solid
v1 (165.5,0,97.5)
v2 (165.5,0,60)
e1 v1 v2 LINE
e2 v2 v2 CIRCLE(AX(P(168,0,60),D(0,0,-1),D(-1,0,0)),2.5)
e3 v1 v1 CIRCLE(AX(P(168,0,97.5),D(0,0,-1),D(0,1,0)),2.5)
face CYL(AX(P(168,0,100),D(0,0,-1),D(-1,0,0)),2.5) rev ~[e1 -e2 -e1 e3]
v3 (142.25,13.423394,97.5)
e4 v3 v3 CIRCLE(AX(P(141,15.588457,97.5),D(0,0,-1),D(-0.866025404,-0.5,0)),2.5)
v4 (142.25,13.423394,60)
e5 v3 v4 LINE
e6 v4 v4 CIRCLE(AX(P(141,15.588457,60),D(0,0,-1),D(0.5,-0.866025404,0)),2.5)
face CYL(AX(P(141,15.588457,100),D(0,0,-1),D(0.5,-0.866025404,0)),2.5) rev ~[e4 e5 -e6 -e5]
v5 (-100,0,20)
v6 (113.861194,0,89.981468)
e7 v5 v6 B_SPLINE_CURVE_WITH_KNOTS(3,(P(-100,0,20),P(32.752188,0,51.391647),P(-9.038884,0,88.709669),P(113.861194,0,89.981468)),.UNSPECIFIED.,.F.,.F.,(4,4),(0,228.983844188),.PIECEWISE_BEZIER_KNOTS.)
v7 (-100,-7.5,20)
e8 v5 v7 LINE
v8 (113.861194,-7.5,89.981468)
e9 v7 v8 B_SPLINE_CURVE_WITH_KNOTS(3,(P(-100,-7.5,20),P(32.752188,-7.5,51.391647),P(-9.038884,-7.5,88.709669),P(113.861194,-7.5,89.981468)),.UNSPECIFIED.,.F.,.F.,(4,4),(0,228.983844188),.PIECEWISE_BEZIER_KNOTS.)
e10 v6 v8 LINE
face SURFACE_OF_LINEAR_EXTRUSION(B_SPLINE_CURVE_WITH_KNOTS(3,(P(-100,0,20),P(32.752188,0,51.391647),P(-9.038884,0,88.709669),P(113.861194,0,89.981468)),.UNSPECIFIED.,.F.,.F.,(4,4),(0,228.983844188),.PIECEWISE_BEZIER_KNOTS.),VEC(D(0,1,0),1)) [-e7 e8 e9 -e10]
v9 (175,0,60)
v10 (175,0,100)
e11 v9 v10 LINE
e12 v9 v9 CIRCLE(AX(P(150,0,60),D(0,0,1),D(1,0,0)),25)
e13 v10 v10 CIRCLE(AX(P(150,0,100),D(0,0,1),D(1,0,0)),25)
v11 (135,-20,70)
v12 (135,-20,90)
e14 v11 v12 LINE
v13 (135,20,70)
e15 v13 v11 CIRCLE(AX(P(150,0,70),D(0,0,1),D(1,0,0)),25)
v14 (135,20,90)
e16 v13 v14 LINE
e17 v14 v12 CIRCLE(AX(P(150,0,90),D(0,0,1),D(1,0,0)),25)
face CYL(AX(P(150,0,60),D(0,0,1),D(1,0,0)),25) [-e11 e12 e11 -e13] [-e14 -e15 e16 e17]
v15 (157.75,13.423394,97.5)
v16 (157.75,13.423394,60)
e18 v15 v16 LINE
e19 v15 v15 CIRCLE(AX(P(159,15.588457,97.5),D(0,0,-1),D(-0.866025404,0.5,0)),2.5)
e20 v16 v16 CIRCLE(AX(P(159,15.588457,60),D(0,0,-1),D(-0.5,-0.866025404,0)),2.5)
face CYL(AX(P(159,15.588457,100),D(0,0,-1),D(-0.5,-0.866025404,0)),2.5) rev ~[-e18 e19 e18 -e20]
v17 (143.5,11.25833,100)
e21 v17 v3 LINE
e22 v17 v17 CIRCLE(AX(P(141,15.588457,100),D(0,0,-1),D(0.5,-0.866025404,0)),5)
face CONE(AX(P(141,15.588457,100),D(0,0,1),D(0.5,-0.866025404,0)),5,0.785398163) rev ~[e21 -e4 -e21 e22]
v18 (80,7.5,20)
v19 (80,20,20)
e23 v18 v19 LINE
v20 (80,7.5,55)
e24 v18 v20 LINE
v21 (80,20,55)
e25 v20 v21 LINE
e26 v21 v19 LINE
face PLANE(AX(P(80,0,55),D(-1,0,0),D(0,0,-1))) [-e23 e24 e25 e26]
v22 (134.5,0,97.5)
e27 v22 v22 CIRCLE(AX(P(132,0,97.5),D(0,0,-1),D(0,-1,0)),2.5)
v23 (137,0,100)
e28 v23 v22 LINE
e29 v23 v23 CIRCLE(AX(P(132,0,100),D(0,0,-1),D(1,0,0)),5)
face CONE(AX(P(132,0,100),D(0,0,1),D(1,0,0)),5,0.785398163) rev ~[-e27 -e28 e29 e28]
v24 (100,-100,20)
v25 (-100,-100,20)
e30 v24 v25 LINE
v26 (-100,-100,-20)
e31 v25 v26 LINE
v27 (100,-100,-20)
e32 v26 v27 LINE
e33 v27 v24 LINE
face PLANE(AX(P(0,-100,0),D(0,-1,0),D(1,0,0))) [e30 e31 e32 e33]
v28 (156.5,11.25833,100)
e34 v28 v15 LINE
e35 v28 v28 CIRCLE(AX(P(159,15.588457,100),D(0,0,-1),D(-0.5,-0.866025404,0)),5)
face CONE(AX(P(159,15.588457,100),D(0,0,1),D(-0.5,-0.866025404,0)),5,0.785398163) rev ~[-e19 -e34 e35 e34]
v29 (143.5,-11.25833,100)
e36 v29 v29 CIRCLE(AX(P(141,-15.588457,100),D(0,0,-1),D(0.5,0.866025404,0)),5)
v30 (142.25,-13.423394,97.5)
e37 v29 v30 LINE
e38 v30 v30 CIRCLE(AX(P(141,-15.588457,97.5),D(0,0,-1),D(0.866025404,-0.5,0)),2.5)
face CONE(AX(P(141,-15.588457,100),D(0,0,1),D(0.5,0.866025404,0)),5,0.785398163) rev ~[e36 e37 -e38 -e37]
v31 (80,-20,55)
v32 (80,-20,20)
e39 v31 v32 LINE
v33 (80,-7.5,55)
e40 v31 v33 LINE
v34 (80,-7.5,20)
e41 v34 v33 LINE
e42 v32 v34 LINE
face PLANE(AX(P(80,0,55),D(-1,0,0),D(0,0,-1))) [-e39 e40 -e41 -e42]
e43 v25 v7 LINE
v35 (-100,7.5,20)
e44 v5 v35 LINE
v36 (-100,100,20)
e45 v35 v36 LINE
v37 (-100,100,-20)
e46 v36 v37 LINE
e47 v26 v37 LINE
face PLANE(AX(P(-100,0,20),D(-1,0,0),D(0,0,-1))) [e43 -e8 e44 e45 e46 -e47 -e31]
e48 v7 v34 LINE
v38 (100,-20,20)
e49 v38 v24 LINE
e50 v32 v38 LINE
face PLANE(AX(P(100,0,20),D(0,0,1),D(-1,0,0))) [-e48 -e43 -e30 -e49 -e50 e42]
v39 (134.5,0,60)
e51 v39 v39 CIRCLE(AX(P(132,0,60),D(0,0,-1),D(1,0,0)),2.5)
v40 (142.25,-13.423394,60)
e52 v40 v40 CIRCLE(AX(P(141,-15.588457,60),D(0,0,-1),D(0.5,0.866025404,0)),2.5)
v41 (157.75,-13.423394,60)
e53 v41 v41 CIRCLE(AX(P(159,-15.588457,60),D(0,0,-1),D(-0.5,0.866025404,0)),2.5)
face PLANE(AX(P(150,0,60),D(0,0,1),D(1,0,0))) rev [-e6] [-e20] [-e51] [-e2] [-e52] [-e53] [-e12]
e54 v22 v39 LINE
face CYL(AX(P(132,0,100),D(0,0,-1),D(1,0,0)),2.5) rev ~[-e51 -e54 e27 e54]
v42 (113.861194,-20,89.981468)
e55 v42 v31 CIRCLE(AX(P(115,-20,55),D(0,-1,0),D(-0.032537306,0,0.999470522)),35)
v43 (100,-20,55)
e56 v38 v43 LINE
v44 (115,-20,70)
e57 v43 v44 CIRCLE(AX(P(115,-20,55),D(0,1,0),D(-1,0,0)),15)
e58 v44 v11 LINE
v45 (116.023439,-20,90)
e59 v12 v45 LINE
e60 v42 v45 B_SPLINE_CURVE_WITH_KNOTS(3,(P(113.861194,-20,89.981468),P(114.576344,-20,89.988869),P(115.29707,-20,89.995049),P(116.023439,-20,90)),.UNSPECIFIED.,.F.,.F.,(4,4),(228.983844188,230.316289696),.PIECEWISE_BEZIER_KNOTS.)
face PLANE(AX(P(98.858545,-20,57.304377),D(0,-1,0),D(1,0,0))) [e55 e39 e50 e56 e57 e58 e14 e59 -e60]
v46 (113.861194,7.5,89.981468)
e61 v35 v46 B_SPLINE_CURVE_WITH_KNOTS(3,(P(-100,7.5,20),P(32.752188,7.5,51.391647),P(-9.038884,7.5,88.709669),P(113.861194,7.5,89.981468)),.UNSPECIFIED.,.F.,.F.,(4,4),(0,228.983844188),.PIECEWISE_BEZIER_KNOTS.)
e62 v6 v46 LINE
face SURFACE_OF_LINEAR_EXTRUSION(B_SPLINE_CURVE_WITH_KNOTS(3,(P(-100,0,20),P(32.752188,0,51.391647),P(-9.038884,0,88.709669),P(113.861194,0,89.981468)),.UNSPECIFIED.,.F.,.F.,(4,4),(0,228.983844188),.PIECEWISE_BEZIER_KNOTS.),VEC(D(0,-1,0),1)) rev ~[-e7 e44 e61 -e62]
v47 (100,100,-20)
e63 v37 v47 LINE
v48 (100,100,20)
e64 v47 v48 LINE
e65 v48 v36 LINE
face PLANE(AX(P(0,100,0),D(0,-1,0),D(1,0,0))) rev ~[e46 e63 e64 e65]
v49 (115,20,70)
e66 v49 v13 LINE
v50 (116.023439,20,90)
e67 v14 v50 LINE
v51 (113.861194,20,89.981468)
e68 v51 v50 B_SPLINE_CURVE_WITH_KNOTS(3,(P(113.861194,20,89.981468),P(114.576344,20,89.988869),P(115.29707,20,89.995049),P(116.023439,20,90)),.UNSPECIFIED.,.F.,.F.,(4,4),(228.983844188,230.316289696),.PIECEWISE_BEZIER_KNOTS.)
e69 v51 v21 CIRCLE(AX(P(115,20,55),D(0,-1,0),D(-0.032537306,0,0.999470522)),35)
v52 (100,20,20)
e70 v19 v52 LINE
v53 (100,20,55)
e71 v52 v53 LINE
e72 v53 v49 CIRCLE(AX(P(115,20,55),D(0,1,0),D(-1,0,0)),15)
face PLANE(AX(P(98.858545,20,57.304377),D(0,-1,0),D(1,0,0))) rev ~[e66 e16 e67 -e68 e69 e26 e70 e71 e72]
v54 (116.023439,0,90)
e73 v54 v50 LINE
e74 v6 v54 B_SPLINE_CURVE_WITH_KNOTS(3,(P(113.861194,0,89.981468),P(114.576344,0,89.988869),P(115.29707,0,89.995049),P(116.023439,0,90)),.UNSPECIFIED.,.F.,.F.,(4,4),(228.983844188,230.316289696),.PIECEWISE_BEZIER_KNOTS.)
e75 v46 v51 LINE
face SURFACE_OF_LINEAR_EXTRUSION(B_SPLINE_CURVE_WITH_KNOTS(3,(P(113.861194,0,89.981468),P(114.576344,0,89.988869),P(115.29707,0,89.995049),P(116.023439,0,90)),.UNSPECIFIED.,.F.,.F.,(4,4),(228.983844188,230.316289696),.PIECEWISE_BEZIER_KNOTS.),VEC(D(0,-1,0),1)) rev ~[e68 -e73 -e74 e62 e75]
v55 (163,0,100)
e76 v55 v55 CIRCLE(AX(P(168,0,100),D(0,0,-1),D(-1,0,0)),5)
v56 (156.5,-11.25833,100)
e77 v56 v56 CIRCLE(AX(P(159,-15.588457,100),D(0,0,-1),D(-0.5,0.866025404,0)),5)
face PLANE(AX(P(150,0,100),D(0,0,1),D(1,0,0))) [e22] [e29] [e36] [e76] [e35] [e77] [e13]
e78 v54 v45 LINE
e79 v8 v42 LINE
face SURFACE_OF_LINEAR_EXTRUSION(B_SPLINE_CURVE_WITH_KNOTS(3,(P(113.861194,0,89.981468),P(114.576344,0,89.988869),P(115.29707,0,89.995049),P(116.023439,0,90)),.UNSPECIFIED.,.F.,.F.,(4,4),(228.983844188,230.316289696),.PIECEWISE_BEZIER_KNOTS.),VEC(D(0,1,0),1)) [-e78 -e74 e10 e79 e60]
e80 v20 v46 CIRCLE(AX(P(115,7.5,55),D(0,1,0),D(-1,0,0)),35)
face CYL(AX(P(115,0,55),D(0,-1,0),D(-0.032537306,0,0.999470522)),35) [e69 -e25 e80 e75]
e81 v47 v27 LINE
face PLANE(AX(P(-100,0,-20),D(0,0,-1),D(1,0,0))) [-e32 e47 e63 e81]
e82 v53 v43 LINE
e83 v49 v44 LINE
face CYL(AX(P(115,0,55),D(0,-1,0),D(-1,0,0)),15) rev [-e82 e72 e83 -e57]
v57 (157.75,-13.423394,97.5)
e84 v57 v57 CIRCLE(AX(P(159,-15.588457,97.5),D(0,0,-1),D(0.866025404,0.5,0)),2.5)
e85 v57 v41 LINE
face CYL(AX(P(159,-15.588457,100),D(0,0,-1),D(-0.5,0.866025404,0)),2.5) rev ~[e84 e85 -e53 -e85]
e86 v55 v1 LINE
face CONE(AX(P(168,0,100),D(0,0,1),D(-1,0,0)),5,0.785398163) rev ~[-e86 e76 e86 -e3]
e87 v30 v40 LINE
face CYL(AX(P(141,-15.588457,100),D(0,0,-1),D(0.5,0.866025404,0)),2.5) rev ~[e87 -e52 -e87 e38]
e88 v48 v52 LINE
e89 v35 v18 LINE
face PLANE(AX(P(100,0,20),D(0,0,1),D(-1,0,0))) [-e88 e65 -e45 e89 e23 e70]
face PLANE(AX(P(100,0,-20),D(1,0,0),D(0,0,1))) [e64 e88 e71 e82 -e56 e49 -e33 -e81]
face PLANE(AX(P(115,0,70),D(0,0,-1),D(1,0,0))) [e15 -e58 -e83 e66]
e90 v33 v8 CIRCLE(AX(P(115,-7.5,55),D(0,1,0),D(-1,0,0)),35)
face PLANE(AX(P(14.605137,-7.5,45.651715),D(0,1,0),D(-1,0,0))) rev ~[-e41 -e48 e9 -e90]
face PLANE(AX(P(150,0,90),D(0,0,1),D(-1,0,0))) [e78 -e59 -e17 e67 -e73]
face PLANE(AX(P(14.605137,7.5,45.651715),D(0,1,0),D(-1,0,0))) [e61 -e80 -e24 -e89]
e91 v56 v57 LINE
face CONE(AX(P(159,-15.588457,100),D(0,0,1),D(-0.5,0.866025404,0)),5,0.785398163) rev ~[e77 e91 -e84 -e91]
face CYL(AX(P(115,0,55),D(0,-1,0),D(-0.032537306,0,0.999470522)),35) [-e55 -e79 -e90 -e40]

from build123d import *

# Parameters (mm, degrees)
F1_DEPTH        = 100
F0_W            = 25
F0_H            = 20
F2_DEPTH        = 20
F3_DEPTH        = 7.5
F6_D            = 5
F6_CSINK_D      = 10
F6_CSINK_ANGLE  = 90
F6_COPIES_COUNT = 6


# Not quite as in the source:
# - a pattern or mirror of a feature is missing from the dataset's text; its kind, count and spacing are read off the source's solid


with BuildPart() as f1:
    # F0 (on Front) → F1 (new body, symmetric)
    with BuildSketch(Plane.XZ):
        Polygon((-100, -20), (100, -20), (100, 20), (80, 20), (-100, 20), align=None)
    extrude(amount=F1_DEPTH, both=True)

    # F0 (on Front) → F2 (join, symmetric)
    with BuildSketch(Plane.XZ):
        with BuildLine():
            Line((80, 20), (100, 20))
            Line((100, 20), (100, 55))
            ThreePointArc((100, 55), (104.3933982822, 65.6066017178), (115, 70))
            Line((115, 70), (125, 70))
            Line((125, 70), (125, 90))
            Line((125, 90), (116.0234387074, 90))
            add(Edge.make_bspline(
                [(113.8611942755, 89.9814682585), (114.576343668, 89.9888687938), (115.2970695321, 89.9950487976), (116.0234387074, 90)],
                knots=[228.983844188, 228.983844188, 228.983844188, 228.983844188, 230.3162896959, 230.3162896959, 230.3162896959, 230.3162896959], degree=3))
            ThreePointArc((113.8611942755, 89.9814682585), (89.8518569238, 79.3427792132), (80, 55))
            Line((80, 55), (80, 20))
        make_face()
        with Locations((137.5, 80)):
            Rectangle(F0_W, F0_H)
    extrude(amount=F2_DEPTH, both=True)

    # F0 (on Front) → F3 (join, symmetric)
    with BuildSketch(Plane.XZ):
        with BuildLine():
            add(Edge.make_bspline(
                [(-100, 20), (32.7521878521, 51.3916469178), (-9.0388838859, 88.7096691401), (113.8611942755, 89.9814682585)],
                knots=[0, 0, 0, 0, 228.983844188, 228.983844188, 228.983844188, 228.983844188], degree=3))
            Line((-100, 20), (80, 20))
            Line((80, 20), (80, 55))
            ThreePointArc((80, 55), (89.8518569238, 79.3427792132), (113.8611942755, 89.9814682585))
        make_face()
    extrude(amount=F3_DEPTH, both=True)

    # F0 (on Front) → F4 (revolve)
    with BuildSketch(Plane.XZ):
        Polygon((150, 90), (150, 70), (150, 60), (175, 60), (175, 100), (150, 100), align=None)
    revolve(axis=Axis((150, 0, 80), (0, 0, 1)))

    # F6 (through all)
    with Locations(Plane.XY.offset(100)):
        with Locations((168, 0)):
            f6 = CounterSinkHole(F6_D / 2, F6_CSINK_D / 2, counter_sink_angle=F6_CSINK_ANGLE)

    # F6_copies: F6 ×6 about axis
    f6_copies_axis = Axis((150, 0, 0), (0, 0, 1))
    for i in range(1, F6_COPIES_COUNT):
        add(f6.rotate(f6_copies_axis, i * 360 / F6_COPIES_COUNT), mode=Mode.SUBTRACT)


solid = f1.part
